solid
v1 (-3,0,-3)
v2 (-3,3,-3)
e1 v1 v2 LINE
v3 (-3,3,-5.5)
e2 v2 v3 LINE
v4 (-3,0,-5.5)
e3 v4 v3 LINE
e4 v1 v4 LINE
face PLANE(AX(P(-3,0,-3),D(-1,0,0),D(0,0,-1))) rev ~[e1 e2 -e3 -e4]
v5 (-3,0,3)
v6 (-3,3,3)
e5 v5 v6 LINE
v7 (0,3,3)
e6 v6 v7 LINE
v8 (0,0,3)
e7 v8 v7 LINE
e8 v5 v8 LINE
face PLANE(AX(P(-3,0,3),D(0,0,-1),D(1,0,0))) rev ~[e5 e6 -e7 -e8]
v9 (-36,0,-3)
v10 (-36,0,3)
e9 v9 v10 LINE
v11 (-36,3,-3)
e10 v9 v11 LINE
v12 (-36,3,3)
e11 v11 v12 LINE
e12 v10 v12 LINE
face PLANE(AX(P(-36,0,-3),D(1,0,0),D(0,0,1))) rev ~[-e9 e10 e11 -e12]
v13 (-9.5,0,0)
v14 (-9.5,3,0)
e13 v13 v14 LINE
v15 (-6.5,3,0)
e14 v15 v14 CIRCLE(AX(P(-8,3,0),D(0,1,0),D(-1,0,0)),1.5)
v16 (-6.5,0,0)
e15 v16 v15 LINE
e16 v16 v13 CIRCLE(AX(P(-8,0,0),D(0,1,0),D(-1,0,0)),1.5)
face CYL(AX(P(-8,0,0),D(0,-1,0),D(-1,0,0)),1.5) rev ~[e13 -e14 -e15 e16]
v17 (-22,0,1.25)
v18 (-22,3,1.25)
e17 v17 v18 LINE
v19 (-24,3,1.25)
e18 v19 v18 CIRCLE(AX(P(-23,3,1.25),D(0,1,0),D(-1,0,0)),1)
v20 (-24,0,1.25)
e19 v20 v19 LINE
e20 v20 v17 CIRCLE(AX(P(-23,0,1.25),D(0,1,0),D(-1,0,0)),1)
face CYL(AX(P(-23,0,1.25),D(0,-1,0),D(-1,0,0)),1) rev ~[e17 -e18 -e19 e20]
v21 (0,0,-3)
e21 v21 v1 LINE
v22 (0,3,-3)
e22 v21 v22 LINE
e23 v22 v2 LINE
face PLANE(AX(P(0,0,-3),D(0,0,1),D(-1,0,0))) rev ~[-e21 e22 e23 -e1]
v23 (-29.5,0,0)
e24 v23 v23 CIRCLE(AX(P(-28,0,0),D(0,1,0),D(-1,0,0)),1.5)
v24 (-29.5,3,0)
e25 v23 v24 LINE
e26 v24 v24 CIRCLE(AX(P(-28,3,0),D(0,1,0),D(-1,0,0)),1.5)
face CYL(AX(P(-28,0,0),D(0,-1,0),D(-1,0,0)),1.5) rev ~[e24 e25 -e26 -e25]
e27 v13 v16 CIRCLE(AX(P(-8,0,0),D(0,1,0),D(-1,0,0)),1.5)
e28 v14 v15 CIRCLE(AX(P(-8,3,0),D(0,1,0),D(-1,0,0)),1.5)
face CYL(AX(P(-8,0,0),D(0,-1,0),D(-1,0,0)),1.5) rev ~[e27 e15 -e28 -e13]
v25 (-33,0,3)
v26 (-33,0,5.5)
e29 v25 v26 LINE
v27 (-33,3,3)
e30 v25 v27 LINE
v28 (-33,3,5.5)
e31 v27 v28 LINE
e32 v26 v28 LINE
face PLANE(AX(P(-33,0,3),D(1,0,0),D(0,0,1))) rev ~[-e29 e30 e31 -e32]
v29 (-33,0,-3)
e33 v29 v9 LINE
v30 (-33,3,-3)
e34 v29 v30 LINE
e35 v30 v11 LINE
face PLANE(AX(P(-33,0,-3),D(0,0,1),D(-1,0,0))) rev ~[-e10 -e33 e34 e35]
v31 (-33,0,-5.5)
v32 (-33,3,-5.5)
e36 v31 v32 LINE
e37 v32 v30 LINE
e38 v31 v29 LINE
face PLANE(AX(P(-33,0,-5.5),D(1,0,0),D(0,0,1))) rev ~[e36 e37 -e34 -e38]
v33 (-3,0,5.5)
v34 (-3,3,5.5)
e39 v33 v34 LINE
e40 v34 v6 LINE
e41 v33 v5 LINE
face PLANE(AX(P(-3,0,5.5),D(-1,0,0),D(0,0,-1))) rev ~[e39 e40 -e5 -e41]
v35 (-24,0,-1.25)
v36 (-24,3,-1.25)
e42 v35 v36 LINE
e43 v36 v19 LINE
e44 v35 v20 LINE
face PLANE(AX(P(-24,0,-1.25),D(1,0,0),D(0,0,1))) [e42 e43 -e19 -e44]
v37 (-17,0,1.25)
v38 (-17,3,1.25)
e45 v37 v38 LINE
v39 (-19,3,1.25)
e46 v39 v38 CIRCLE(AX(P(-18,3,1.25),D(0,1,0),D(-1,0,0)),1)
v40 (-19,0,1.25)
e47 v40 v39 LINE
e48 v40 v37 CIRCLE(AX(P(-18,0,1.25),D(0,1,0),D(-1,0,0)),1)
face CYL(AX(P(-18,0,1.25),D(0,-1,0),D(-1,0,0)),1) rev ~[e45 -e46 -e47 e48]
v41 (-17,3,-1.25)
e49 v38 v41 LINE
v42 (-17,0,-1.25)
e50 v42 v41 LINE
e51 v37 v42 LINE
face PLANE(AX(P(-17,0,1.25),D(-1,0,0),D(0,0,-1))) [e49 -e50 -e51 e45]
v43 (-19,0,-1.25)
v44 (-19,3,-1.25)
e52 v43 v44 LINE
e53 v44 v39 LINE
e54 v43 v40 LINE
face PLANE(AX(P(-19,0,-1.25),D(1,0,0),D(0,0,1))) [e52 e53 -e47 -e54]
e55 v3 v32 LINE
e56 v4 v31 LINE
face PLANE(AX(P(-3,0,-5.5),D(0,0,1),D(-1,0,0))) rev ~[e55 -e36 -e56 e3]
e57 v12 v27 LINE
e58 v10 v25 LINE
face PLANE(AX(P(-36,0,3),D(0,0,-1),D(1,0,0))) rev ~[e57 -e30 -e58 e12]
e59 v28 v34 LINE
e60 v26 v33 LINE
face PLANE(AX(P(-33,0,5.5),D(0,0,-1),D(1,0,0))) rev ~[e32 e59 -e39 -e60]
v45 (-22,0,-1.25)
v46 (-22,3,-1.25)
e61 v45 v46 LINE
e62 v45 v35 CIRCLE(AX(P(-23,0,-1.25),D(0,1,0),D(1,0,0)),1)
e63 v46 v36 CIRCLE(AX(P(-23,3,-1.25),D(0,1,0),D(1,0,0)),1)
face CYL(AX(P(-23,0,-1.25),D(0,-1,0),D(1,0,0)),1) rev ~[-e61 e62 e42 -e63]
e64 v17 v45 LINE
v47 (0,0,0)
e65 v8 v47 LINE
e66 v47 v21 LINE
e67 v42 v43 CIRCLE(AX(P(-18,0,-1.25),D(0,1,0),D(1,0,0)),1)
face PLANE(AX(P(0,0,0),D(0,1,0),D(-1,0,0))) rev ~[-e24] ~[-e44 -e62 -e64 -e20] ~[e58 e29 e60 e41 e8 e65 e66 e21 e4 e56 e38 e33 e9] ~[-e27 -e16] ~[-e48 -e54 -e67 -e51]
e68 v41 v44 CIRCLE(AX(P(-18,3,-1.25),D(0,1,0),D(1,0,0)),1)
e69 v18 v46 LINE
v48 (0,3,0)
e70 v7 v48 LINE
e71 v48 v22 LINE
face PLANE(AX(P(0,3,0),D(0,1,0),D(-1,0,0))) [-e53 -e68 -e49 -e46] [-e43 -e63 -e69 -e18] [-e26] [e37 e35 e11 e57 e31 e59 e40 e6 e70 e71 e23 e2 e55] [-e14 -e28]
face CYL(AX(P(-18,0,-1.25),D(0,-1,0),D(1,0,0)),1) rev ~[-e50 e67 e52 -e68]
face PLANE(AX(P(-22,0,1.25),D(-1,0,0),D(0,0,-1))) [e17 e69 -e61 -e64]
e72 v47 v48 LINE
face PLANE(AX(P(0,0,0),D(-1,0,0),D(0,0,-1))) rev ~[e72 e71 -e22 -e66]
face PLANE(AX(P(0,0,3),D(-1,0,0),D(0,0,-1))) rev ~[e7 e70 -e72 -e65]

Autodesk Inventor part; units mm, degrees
ref_plane "YZ Plane" through (0, 0, 0) normal (1, 0, 0) x (0, 1, 0)
ref_plane "XZ Plane" through (0, 0, 0) normal (0, 1, 0) x (-1, 0, 0)
ref_plane "XY Plane" through (0, 0, 0) normal (0, 0, 1) x (1, 0, 0)
sketch "Sketch1" plane through (0, 0, 0) normal (0, 1, 0) x (-1, 0, 0)
  line L0 (0, 0) -> (0, -3)
  line L1 (0, -3) -> (3, -3)
  line L2 (3, -3) -> (3, -5.5)
  line L3 (3, -5.5) -> (33, -5.5)
  line L4 (33, -5.5) -> (33, -3)
  line L5 (33, -3) -> (36, -3)
  line L6 (36, -3) -> (36, 3)
  line L7 (36, 3) -> (33, 3)
  line L8 (33, 3) -> (33, 5.5)
  line L9 (33, 5.5) -> (3, 5.5)
  line L10 (3, 5.5) -> (3, 3)
  line L11 (3, 3) -> (0, 3)
  line L12 (0, 3) -> (0, 0)
  circle A0 centre (28, 0) radius 1.5
  line L13 (0, 0) -> (8, 0)
  circle A1 centre (8, 0) radius 1.5
  arc A2 (17, -1.25) -> (19, -1.25) centre (18, -1.25) ccw
  arc A3 (19, 1.25) -> (17, 1.25) centre (18, 1.25) ccw
  line L14 (19, -1.25) -> (19, 1.25)
  line L15 (17, 1.25) -> (17, -1.25)
  arc A4 (22, -1.25) -> (24, -1.25) centre (23, -1.25) ccw
  arc A5 (24, 1.25) -> (22, 1.25) centre (23, 1.25) ccw
  line L16 (24, -1.25) -> (24, 1.25)
  line L17 (22, 1.25) -> (22, -1.25)
  dimension "d15" = 3
  dimension "d16" = 3
  dimension "d17" = 2.5
  dimension "d18" = 30
  dimension "d19" = 3
  dimension "d20" = 6
  dimension "d21" = 2.5
  dimension "d22" = 30
  dimension "d26" = 8
  dimension "d27" = 3
  dimension "d31" = 8
  dimension "d34" = 1
  dimension "d35" = 11
  dimension "d36" = 20
  dimension "d38" = 1
extrude "Extrusion1" add sketch "Sketch1" along normal blind 3
properties part number "Laser Mount Plate" material "Polycarbonate, Smoke"
